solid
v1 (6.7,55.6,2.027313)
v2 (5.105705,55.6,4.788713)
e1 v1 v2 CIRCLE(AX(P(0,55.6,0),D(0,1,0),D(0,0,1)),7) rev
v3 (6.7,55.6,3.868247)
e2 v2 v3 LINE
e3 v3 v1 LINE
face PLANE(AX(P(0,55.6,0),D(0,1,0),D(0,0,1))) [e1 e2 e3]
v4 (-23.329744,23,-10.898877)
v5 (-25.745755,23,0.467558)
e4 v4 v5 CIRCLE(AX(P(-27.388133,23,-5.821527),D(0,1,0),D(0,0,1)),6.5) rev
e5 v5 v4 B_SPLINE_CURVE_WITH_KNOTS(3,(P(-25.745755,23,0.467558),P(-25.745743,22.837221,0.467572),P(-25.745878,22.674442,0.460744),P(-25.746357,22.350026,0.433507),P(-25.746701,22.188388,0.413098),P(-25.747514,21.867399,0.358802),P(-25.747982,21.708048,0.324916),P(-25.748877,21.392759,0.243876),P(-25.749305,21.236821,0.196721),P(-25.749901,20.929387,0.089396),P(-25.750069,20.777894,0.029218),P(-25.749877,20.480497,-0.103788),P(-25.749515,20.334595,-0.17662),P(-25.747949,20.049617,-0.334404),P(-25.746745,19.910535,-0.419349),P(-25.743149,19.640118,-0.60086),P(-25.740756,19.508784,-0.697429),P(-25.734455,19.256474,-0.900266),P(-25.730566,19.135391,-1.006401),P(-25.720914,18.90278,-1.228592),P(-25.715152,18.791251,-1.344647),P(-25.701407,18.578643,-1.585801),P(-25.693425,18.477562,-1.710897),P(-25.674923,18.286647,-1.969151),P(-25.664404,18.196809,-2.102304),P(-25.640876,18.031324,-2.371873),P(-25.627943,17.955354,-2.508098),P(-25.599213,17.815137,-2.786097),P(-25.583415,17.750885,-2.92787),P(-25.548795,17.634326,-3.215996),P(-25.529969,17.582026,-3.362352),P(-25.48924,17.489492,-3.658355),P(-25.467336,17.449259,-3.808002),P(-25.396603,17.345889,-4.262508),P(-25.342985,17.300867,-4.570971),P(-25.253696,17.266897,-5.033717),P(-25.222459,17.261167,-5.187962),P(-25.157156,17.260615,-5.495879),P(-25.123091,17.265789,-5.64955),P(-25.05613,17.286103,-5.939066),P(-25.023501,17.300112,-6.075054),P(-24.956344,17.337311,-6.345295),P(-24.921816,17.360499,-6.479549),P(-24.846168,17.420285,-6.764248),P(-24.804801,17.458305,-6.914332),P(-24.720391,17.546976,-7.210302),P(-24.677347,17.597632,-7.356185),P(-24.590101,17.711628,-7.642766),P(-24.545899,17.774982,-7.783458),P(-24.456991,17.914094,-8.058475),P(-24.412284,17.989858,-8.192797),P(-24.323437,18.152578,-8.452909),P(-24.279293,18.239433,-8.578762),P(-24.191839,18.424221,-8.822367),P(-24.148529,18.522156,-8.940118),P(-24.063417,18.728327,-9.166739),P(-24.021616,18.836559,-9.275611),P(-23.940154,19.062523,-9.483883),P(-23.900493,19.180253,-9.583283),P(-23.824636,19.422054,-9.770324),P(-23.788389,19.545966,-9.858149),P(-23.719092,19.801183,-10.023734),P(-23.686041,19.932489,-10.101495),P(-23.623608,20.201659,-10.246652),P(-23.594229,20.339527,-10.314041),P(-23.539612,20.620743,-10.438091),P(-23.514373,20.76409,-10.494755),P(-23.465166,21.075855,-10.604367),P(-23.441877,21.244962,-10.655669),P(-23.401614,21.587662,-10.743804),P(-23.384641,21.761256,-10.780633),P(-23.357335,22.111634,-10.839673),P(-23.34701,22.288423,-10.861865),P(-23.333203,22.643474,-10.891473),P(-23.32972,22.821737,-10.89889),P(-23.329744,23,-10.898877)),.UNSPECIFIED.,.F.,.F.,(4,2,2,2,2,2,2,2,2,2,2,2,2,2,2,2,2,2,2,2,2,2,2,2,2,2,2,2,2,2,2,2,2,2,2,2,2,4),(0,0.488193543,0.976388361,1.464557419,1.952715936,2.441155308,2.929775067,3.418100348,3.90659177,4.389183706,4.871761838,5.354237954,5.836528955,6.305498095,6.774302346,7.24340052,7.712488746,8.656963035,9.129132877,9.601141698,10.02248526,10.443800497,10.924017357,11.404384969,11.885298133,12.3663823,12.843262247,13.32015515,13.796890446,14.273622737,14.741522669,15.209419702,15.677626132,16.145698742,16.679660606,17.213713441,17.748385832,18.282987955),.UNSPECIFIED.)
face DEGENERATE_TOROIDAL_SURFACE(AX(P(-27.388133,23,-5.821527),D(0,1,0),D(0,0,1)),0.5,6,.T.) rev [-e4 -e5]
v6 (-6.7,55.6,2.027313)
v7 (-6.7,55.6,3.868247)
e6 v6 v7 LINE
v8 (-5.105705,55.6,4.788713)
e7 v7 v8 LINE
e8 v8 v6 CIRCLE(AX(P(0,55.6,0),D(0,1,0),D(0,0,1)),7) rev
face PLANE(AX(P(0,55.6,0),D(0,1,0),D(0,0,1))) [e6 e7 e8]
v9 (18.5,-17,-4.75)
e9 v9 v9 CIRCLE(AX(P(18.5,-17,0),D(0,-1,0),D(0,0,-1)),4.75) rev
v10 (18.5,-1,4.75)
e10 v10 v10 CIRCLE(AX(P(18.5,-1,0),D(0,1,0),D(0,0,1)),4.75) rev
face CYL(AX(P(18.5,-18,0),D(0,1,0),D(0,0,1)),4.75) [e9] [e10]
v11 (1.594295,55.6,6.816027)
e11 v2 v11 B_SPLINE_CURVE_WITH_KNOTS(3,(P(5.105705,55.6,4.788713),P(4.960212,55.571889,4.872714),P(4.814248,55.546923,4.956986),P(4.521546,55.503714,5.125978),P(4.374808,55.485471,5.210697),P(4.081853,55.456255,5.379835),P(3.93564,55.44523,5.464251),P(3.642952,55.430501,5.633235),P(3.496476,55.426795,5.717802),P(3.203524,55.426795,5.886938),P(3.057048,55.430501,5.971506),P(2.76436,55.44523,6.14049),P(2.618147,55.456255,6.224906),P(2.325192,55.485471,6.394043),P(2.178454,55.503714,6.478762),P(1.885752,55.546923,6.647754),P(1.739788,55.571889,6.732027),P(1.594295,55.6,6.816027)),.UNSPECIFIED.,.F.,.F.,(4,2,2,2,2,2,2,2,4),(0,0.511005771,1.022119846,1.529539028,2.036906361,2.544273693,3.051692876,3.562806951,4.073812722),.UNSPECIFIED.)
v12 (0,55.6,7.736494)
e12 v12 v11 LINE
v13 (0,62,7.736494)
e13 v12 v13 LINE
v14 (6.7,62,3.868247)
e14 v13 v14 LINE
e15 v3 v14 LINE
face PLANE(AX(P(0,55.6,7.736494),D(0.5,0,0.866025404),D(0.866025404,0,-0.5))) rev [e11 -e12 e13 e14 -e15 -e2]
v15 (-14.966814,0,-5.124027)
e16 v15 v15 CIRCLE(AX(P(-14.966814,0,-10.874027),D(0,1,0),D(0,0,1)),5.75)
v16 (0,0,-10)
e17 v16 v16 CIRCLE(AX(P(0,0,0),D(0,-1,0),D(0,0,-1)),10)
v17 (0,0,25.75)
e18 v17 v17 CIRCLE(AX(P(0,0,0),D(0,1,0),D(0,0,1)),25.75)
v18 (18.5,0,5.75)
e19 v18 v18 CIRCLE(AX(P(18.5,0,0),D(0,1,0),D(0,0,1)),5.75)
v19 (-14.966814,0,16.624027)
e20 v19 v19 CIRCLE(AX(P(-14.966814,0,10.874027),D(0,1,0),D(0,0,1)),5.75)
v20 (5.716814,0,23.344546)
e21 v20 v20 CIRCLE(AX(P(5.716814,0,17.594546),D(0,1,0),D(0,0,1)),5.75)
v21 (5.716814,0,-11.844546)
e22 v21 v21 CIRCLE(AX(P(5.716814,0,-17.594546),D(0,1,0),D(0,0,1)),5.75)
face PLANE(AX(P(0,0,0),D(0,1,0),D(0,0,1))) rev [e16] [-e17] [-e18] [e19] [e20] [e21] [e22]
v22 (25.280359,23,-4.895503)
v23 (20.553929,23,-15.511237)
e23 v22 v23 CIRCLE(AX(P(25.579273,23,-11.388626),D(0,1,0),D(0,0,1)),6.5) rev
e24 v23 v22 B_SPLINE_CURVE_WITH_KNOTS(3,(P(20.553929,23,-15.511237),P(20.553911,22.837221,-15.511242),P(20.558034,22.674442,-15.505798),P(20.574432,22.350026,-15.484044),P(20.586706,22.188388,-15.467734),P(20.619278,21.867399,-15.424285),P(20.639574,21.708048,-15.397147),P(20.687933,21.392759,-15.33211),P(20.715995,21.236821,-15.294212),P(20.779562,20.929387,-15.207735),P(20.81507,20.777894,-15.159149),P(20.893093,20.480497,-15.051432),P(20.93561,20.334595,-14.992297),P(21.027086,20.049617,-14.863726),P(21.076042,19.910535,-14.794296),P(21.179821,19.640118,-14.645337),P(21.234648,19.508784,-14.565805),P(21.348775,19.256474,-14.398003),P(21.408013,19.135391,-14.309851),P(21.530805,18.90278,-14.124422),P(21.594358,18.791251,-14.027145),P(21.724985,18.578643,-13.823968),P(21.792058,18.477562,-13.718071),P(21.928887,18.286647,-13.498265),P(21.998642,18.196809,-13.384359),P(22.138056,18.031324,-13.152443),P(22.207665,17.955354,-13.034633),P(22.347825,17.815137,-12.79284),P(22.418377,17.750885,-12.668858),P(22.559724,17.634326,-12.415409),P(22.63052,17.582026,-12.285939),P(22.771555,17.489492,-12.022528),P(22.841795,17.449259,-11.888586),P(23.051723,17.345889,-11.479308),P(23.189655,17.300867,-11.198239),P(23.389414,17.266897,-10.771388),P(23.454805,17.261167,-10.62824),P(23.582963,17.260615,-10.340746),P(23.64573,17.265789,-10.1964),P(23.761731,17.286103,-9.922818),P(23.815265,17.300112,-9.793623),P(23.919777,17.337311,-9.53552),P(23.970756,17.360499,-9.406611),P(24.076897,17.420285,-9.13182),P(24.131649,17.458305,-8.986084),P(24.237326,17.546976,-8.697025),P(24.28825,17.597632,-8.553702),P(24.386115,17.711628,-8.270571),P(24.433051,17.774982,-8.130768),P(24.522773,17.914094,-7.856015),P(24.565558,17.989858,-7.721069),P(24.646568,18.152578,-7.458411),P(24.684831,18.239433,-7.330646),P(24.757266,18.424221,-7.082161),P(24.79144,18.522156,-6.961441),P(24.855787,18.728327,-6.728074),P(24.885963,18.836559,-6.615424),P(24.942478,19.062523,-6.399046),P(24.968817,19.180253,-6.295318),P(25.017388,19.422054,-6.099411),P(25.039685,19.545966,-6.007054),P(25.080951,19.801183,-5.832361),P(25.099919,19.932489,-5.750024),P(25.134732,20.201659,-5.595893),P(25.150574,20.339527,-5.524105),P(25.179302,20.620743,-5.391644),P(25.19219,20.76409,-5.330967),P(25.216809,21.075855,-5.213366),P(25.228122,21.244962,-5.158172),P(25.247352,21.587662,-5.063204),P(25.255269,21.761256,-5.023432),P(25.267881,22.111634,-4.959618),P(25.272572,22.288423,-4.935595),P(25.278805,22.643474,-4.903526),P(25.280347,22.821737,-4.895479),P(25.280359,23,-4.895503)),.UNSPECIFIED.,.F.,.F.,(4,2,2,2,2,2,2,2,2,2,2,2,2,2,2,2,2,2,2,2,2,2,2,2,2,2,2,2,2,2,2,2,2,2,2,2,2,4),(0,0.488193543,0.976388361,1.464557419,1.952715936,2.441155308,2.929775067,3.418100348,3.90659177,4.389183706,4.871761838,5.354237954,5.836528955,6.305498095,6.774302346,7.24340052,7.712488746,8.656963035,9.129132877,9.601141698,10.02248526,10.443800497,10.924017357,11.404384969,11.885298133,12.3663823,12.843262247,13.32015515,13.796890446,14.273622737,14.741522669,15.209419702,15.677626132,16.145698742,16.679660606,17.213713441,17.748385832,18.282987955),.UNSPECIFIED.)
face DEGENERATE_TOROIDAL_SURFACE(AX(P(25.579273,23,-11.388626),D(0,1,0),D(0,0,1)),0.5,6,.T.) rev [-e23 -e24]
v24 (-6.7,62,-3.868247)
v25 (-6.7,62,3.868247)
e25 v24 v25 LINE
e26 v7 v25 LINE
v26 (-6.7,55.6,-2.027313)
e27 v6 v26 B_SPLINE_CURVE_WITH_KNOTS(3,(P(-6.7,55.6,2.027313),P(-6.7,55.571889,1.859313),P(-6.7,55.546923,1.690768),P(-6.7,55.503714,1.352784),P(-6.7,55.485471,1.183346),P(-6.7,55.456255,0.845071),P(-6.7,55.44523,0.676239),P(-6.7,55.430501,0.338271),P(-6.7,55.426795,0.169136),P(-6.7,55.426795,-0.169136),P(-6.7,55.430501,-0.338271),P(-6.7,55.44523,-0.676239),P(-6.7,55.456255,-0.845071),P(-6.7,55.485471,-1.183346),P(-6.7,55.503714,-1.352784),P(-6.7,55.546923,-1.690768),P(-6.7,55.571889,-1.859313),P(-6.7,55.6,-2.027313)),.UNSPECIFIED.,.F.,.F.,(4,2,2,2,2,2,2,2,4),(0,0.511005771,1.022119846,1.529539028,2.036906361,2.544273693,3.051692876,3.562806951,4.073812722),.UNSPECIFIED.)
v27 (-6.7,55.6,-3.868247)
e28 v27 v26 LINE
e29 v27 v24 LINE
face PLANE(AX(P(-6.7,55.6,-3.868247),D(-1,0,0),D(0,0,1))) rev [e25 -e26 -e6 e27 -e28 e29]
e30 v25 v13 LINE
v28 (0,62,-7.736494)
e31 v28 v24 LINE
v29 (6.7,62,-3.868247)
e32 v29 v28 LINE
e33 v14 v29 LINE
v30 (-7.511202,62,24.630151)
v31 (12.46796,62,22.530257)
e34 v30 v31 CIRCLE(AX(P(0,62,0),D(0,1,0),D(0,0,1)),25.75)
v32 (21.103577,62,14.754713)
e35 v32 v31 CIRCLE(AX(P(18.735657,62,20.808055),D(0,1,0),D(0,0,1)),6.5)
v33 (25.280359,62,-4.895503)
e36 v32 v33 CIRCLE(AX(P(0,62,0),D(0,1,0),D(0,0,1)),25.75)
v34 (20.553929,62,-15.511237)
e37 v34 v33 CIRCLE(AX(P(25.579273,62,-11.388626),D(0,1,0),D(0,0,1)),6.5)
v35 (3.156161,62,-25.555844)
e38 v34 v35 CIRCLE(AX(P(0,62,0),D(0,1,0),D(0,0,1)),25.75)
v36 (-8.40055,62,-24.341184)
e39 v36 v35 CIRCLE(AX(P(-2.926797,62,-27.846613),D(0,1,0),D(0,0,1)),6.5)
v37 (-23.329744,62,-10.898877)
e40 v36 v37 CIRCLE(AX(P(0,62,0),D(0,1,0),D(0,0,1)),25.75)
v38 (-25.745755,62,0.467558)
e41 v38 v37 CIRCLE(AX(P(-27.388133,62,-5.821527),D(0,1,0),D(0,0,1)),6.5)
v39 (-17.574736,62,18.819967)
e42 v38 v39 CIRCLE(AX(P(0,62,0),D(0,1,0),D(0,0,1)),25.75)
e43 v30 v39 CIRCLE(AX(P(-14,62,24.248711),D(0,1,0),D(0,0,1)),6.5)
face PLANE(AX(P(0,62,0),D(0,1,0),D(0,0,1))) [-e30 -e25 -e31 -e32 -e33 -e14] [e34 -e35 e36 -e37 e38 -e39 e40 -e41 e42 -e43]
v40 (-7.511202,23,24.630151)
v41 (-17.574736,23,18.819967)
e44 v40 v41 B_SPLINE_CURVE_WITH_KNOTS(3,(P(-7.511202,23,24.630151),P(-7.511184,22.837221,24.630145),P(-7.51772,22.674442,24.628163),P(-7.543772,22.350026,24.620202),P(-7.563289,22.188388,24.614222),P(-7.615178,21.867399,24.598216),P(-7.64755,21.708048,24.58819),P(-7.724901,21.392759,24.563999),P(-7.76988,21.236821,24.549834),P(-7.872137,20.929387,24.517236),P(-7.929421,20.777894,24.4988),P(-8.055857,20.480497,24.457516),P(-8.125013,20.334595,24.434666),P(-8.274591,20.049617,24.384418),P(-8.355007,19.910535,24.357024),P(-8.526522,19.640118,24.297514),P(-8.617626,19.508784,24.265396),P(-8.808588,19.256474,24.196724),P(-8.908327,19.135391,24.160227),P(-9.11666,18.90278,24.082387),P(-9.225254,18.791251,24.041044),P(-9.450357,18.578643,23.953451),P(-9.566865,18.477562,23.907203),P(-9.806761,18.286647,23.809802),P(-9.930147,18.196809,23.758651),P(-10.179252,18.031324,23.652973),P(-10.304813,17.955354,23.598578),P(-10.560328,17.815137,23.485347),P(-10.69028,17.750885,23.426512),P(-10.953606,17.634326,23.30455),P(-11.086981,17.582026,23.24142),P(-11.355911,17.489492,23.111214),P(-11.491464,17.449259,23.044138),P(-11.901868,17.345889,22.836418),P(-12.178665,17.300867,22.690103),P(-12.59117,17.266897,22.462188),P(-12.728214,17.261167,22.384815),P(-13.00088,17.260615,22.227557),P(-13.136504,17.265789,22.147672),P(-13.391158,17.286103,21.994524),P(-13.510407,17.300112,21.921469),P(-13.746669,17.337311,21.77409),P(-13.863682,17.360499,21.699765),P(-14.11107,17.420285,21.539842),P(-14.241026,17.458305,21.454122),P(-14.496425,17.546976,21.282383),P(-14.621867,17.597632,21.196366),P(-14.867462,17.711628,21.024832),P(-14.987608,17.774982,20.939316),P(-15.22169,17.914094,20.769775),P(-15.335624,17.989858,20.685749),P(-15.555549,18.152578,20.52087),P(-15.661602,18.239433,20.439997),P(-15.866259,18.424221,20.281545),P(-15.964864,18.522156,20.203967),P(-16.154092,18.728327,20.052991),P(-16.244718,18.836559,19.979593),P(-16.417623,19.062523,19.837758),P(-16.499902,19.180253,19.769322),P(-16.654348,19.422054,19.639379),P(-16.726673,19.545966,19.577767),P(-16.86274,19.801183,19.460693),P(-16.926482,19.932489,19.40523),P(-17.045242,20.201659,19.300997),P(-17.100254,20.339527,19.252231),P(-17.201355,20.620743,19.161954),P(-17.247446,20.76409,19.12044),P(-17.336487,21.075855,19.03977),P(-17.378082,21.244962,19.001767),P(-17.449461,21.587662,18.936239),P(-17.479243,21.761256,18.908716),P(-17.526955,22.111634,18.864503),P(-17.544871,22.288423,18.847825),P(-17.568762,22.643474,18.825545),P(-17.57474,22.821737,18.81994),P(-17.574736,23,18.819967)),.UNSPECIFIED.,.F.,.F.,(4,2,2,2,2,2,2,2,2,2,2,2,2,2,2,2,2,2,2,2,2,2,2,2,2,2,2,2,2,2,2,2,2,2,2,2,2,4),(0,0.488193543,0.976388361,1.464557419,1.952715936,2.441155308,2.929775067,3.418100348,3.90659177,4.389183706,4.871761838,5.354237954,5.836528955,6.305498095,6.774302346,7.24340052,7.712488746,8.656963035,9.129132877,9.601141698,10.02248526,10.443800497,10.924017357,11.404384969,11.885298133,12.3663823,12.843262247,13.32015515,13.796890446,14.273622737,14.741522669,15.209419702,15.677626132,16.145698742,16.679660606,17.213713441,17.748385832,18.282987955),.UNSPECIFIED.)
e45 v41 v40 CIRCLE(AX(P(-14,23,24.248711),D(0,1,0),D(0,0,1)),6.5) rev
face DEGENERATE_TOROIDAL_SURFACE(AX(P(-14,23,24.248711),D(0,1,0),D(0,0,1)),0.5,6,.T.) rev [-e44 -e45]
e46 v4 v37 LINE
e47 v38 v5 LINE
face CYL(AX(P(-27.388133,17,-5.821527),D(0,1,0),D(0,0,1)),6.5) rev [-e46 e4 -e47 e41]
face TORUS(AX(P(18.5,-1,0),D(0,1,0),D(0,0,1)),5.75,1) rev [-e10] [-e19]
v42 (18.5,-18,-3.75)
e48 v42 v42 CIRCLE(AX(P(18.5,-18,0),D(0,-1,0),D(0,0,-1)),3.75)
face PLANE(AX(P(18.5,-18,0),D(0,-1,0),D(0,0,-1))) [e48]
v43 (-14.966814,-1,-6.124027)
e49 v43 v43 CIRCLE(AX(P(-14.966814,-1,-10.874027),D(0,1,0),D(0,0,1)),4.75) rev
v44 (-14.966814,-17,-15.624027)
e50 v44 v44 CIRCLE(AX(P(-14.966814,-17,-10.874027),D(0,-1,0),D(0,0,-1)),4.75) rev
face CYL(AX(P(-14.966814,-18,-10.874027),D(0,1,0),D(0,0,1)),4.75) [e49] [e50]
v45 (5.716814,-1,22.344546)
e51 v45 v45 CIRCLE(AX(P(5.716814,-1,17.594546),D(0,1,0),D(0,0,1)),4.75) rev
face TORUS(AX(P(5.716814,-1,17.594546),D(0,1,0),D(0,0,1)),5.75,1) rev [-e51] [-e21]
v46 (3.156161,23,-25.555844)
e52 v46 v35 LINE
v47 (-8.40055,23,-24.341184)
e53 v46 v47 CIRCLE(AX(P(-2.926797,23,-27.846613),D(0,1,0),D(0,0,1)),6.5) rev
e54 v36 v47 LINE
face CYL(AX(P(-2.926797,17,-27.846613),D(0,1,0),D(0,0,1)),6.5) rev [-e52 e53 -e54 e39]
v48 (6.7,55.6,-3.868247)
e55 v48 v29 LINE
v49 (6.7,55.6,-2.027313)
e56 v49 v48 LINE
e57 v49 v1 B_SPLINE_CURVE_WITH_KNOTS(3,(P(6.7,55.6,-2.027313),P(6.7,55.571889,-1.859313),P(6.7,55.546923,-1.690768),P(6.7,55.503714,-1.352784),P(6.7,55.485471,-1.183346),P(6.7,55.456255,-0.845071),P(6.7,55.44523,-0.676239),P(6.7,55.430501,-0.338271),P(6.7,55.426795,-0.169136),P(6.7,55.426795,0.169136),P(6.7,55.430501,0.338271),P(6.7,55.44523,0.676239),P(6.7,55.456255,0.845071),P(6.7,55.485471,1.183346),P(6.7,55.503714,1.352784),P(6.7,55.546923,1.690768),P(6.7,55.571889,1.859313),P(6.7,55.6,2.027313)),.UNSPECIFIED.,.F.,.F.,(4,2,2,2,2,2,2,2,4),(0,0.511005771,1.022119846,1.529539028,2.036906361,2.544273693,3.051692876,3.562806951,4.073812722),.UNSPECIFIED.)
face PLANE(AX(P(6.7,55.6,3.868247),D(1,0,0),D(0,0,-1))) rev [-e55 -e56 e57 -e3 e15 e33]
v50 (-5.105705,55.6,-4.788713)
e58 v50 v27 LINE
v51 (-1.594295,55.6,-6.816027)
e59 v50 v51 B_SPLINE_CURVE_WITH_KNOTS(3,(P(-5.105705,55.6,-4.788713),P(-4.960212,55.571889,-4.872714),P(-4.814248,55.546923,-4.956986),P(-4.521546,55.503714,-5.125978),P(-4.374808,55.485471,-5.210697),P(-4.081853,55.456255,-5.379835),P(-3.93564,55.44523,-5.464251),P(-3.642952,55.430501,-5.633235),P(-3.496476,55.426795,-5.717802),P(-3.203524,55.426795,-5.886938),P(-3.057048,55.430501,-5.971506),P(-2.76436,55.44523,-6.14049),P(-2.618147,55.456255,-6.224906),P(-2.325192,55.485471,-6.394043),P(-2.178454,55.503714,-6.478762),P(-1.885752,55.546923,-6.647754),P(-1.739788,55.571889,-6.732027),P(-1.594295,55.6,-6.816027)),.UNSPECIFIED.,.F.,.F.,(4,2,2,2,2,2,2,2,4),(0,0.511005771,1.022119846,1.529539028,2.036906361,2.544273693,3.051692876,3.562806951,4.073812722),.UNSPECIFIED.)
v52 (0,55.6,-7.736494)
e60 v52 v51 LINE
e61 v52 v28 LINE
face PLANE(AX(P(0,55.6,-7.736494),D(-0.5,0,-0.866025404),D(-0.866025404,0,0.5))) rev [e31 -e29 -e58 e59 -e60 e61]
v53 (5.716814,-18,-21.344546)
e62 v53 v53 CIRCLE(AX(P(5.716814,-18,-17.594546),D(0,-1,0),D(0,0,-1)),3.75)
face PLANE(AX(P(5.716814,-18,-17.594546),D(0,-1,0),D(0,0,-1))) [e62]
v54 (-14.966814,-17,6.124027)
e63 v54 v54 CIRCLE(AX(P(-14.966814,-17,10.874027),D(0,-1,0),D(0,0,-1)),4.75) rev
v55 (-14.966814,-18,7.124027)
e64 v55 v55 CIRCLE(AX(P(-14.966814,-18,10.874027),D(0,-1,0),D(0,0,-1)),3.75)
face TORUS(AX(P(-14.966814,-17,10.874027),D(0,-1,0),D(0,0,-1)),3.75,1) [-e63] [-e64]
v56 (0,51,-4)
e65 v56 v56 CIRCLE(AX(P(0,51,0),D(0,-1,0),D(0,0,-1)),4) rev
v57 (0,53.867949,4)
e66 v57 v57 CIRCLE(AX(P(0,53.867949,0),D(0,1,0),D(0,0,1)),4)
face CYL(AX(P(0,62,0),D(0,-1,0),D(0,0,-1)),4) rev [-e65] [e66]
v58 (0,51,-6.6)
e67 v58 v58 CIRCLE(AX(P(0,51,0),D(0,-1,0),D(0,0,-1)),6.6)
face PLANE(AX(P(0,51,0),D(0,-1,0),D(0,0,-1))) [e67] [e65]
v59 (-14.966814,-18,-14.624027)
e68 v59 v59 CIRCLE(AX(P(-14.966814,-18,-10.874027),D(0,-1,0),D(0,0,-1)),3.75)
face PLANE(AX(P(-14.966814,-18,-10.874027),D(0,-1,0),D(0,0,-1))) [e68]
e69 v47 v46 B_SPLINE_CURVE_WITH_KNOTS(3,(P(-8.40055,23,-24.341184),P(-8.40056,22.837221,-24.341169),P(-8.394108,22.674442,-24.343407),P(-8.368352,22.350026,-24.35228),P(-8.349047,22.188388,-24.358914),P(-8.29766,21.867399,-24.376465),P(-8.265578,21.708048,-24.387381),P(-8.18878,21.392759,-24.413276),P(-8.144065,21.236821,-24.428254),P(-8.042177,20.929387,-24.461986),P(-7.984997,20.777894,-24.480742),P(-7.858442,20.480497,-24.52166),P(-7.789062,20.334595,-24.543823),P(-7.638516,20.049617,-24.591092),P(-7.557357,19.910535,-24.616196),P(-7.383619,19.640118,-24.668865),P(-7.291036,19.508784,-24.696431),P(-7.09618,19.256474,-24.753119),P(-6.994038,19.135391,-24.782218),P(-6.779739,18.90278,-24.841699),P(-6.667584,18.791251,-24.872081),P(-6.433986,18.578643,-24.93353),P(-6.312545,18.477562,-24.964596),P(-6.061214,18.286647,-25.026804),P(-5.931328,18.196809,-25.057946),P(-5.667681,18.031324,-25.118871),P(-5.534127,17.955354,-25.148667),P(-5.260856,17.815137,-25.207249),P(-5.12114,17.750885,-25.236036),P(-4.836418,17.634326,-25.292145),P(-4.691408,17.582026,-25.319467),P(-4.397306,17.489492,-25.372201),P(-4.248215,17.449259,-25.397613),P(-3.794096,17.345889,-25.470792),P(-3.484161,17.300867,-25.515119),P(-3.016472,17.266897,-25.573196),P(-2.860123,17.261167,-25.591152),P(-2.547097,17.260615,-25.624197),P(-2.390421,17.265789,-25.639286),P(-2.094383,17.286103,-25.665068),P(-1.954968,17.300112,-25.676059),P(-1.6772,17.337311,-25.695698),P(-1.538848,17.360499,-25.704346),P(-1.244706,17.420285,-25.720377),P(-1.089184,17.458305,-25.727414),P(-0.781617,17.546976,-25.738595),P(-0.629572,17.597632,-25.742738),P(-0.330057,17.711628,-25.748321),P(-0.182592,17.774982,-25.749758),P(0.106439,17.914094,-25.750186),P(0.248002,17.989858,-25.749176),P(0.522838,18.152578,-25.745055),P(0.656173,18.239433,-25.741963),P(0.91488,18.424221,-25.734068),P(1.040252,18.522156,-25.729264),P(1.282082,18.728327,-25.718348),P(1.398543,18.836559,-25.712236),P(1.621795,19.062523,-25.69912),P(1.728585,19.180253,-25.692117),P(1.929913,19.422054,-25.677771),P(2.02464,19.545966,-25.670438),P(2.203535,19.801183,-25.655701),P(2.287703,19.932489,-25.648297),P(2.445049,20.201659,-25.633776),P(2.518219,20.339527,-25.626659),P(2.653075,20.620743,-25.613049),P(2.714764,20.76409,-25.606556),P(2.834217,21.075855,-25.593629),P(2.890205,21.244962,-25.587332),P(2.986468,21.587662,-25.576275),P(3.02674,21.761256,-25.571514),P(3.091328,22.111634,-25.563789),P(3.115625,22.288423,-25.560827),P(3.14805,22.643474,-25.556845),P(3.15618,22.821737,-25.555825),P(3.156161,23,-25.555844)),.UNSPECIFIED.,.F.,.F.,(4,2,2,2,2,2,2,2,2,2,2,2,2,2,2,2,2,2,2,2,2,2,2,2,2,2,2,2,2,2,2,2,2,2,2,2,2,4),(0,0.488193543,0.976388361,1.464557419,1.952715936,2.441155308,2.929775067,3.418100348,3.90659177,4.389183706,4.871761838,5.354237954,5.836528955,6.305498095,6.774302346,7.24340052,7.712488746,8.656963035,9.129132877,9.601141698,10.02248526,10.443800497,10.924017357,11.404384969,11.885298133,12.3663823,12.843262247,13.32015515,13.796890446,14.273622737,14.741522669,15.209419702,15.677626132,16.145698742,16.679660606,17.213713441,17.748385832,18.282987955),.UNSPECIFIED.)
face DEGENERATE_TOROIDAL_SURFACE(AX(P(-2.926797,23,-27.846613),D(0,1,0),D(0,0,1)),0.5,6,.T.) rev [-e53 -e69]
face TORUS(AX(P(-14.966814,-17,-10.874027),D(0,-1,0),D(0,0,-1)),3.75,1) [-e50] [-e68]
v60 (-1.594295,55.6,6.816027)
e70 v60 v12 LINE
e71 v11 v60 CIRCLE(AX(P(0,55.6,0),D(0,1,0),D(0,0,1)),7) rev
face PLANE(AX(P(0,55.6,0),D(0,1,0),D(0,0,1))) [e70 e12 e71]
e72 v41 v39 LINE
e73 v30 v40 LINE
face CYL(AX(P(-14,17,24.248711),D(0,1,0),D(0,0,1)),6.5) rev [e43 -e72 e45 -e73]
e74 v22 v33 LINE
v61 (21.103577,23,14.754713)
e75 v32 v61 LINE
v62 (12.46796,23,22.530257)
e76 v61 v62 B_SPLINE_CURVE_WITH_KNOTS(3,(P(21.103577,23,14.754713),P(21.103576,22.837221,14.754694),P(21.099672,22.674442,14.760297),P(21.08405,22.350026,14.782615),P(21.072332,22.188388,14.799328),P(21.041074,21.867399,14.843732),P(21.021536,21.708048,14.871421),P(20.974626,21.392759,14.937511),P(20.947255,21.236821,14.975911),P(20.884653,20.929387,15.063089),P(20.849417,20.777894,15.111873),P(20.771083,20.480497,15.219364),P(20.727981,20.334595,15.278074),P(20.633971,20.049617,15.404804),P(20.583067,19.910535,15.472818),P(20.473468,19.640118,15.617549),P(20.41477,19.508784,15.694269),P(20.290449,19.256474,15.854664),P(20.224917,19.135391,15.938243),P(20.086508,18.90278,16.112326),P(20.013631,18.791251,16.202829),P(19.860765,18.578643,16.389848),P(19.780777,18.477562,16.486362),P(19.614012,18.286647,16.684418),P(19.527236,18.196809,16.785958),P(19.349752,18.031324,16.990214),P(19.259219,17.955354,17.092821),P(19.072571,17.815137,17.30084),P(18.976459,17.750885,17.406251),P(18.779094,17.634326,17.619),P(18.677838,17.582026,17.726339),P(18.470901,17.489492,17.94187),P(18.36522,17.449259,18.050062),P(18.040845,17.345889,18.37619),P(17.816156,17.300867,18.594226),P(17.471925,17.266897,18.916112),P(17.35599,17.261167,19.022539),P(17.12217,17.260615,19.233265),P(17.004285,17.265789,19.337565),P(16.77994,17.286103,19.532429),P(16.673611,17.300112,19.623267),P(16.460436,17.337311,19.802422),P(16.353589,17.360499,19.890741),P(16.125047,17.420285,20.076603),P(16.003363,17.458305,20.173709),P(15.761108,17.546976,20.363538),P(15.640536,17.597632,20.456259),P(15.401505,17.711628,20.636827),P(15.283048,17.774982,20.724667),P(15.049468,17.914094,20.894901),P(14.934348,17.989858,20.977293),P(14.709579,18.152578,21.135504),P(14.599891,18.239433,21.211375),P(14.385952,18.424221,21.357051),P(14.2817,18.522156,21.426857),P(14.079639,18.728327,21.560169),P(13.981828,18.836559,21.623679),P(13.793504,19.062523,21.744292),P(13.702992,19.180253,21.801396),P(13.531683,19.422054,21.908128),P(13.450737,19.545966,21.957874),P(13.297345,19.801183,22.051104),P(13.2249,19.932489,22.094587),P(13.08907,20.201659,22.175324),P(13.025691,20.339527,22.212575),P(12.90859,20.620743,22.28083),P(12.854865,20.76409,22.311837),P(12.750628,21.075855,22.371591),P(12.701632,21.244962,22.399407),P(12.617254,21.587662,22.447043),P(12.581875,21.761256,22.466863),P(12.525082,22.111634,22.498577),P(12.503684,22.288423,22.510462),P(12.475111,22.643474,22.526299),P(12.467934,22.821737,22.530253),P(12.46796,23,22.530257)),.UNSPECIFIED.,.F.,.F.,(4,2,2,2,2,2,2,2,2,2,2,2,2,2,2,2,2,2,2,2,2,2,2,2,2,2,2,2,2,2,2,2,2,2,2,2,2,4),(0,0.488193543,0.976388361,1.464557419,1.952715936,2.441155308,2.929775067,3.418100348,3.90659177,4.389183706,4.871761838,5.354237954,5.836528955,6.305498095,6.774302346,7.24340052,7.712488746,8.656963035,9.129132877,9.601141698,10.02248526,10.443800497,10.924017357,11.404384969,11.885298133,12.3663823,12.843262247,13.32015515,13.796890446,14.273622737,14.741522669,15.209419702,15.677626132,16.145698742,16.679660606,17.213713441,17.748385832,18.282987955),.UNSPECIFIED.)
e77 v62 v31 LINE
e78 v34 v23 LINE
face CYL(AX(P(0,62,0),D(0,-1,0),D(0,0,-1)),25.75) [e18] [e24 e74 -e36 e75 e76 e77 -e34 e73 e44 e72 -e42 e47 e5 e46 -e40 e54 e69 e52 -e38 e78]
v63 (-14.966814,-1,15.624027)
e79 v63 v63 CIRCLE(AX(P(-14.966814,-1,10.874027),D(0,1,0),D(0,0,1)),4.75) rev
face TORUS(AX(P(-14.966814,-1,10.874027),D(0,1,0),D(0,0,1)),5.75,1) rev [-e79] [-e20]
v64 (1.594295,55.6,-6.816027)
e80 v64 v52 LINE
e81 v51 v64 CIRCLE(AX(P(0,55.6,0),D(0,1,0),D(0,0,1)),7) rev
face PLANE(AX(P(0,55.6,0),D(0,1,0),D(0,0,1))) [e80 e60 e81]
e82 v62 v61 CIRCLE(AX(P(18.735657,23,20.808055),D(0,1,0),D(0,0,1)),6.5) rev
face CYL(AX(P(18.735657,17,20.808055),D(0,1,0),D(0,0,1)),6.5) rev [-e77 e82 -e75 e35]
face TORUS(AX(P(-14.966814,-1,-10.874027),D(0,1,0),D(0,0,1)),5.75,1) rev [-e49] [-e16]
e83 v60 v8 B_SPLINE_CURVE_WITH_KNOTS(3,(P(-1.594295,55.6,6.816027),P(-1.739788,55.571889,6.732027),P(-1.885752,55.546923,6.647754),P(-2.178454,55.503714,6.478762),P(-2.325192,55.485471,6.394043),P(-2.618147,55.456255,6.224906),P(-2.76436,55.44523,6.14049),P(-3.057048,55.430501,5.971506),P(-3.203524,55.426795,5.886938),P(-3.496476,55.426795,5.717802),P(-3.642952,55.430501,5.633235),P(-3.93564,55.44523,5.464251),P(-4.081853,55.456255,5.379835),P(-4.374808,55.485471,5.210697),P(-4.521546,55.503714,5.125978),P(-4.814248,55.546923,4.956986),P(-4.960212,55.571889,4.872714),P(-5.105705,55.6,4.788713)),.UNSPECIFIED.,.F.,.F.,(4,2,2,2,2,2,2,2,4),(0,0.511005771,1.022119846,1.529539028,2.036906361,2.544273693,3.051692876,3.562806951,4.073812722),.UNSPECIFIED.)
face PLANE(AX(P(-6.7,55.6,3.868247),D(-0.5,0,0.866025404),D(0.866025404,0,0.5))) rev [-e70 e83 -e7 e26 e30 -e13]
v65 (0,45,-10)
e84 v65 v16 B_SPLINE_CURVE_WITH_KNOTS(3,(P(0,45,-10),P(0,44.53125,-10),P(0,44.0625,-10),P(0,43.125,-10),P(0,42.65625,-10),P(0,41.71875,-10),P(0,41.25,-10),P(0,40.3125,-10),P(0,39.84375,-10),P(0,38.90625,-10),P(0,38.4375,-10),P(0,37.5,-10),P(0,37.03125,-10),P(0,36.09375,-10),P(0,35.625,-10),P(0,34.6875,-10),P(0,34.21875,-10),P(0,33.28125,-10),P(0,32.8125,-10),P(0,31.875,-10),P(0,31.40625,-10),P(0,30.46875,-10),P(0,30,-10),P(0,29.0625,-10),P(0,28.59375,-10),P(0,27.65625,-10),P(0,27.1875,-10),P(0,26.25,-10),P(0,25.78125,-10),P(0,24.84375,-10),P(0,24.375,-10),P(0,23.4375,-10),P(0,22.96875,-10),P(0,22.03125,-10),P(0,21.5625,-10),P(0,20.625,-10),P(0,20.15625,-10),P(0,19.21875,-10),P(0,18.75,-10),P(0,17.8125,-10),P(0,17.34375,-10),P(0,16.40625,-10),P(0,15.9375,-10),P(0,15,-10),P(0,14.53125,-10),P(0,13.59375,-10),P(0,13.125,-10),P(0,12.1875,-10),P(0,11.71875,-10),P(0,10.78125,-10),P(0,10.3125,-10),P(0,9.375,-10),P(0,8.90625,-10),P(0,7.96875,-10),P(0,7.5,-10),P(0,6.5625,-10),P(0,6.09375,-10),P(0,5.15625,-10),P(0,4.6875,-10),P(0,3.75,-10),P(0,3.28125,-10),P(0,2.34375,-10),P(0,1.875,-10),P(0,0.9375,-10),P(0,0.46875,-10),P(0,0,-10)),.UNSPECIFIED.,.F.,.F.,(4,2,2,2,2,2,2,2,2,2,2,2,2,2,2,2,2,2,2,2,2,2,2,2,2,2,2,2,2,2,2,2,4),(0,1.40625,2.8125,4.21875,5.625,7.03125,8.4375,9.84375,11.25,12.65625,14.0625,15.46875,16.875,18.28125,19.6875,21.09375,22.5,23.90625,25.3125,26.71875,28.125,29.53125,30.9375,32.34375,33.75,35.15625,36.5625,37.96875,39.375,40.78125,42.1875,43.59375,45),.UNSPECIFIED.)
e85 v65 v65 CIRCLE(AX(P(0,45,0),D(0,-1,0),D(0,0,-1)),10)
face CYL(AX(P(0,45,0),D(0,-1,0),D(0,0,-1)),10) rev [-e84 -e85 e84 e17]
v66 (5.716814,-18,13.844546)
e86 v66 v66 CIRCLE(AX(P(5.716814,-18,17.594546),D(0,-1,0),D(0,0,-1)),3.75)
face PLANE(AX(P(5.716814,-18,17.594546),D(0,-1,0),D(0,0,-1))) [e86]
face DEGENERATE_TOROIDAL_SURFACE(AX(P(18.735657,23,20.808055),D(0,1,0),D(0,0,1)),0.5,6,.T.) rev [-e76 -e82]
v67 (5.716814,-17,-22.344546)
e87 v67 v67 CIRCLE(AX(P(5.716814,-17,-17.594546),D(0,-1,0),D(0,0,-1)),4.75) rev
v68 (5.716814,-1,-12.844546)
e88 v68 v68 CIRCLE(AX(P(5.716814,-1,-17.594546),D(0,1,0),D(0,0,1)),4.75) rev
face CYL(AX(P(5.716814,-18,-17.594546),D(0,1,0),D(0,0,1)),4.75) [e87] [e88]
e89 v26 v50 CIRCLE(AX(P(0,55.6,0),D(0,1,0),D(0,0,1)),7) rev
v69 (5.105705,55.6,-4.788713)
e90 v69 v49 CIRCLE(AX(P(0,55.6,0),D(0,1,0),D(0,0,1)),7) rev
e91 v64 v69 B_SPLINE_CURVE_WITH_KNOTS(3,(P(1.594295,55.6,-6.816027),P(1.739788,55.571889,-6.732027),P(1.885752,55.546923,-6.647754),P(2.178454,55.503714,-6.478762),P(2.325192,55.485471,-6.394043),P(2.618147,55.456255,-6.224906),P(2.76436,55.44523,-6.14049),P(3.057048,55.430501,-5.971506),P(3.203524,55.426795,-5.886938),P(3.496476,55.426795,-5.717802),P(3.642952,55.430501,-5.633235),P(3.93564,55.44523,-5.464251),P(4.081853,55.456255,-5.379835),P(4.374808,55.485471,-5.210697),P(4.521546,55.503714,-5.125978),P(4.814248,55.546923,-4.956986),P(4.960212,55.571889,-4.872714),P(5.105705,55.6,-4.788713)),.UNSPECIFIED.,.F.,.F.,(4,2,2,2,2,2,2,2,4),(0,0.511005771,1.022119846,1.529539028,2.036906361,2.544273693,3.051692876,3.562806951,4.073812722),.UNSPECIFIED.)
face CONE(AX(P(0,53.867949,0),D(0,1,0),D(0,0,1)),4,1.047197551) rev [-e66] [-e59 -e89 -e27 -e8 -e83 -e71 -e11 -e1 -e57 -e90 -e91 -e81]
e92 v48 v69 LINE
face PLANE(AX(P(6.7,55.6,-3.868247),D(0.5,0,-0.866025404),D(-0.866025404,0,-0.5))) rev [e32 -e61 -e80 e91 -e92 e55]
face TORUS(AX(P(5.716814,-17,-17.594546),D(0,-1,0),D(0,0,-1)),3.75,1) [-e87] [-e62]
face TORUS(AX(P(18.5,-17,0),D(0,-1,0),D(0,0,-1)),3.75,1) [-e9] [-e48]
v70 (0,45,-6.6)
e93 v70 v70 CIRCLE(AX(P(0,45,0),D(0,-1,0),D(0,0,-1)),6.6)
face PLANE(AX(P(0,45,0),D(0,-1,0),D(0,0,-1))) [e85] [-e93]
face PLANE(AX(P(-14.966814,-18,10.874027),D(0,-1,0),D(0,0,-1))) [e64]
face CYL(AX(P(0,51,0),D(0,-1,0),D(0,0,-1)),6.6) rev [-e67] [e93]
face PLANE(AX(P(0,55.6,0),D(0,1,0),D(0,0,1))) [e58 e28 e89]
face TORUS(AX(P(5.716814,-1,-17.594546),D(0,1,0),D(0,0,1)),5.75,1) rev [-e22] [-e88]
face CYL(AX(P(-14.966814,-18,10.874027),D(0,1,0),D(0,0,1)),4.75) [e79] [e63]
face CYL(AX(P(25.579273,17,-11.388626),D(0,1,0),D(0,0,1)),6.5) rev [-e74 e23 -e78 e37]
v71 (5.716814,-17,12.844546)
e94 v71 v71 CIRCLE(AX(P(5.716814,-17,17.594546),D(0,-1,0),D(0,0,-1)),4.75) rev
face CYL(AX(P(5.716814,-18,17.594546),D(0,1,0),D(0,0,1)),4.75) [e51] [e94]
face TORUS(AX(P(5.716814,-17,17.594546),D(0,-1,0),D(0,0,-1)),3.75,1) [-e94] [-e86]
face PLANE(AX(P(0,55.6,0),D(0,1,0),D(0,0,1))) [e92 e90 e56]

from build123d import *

# Parameters (mm, degrees)
SKETCH1_R           = 25.75
BOSS_EXTRUDE1_DEPTH = 62
SKETCH2_R           = 4.75
BOSS_EXTRUDE2_DEPTH = 18
FILLET1_R           = 1
FILLET2_R           = 1
CUT_EXTRUDE1_DEPTH  = 6.4
SKETCH4_R           = 10
CUT_EXTRUDE2_DEPTH  = 45
SKETCH5_R           = 4
CUT_EXTRUDE3_DEPTH  = 73.767609553
SKETCH6_R           = 6.5
CUT_EXTRUDE4_DEPTH  = 45
FILLET3_R           = 6
CHAMFER3_SIZE       = 3
CHAMFER3_SIZE_2     = 1.732050808
SKETCH7_R           = 6.6
CUT_EXTRUDE5_DEPTH  = 6


with BuildPart() as part:
    # Sketch1 → Boss-Extrude1 (new body)
    with BuildSketch(Plane(origin=(0, 0, 0), x_dir=(1, 0, 0), z_dir=(0, 1, 0))):
        with Locations(Location((0, 0, 0), (0, 0, 270))):
            Circle(SKETCH1_R)
    extrude(amount=BOSS_EXTRUDE1_DEPTH)

    # Sketch2 → Boss-Extrude2 (add)
    with BuildSketch(Plane.XZ):
        with Locations(Location((18.5, 0, 0), (0, 0, 90))):
            Circle(SKETCH2_R)
        with Locations(Location((5.716814396, -17.594545551, 0), (0, 0, 90))):
            Circle(SKETCH2_R)
        with Locations(Location((-14.966814396, -10.874027167, 0), (0, 0, 90))):
            Circle(SKETCH2_R)
        with Locations(Location((-14.966814396, 10.874027167, 0), (0, 0, 90))):
            Circle(SKETCH2_R)
        with Locations(Location((5.716814396, 17.594545551, 0), (0, 0, 90))):
            Circle(SKETCH2_R)
    extrude(amount=BOSS_EXTRUDE2_DEPTH)

    # Fillet1
    fillet1_edges = [part.edges().sort_by_distance(p)[0] for p in [
        (-14.966814396, 0, -15.624027167),
        (-14.966814396, 0, 6.124027167),
        (5.716814396, 0, 12.844545551),
        (18.5, 0, -4.75),
        (5.716814396, 0, -22.344545551),
    ]]
    fillet(fillet1_edges, radius=FILLET1_R)

    # Fillet2
    fillet2_edges = [part.edges().sort_by_distance(p)[0] for p in [
        (-14.966814396, -18, -15.624027167),
        (-14.966814396, -18, 6.124027167),
        (5.716814396, -18, 12.844545551),
        (18.5, -18, -4.75),
        (5.716814396, -18, -22.344545551),
    ]]
    fillet(fillet2_edges, radius=FILLET2_R)

    # Sketch3 → Cut-Extrude1 (cut)
    with BuildSketch(Plane(origin=(0, 62, 0), x_dir=(1, 0, 0), z_dir=(0, 1, 0))):
        Polygon((0, -7.736493607), (6.7, -3.868246804), (6.7, 3.868246804), (0, 7.736493607), (-6.7, 3.868246804), (-6.7, -3.868246804), align=None)
    extrude(amount=-CUT_EXTRUDE1_DEPTH, mode=Mode.SUBTRACT)

    # Sketch4 → Cut-Extrude2 (cut)
    with BuildSketch(Plane.XZ):
        with Locations(Location((0, 0, 0), (0, 0, 270))):
            Circle(SKETCH4_R)
    extrude(amount=-CUT_EXTRUDE2_DEPTH, mode=Mode.SUBTRACT)

    # Sketch5 → Cut-Extrude3 (cut, through all)
    with BuildSketch(Plane.XZ.offset(-45)):
        with Locations(Location((0, 0, 0), (0, 0, 270))):
            Circle(SKETCH5_R)
    extrude(amount=-CUT_EXTRUDE3_DEPTH, mode=Mode.SUBTRACT)

    # Sketch6 → Cut-Extrude4 (cut)
    with BuildSketch(Plane(origin=(0, 62, 0), x_dir=(1, 0, 0), z_dir=(0, 1, 0))):
        with Locations((-14, -24.248711306)):
            Circle(SKETCH6_R)
        with Locations((-27.388132821, 5.821527343)):
            Circle(SKETCH6_R)
        with Locations((-2.926796971, 27.84661307)):
            Circle(SKETCH6_R)
        with Locations((25.579272814, 11.388626006)):
            Circle(SKETCH6_R)
        with Locations((18.735656978, -20.808055113)):
            Circle(SKETCH6_R)
    extrude(amount=-CUT_EXTRUDE4_DEPTH, mode=Mode.SUBTRACT)

    # Fillet3
    # the kernel refuses this fillet: 6 mm, written as the material it adds along each edge
    with BuildSketch(Plane(origin=(-14, 17, 24.248711306), x_dir=(-0.5027182271719127, 0, 0.8644503363809452), z_dir=(0.8644503363809452, 0, 0.5027182271719127))) as fillet3_piece_1_section:
        with BuildLine():
            CenterArc((6.5 - FILLET3_R, -FILLET3_R), FILLET3_R, 0, 90)
            Line((6.5 - FILLET3_R, 0), (6.5, 0))
            Line((6.5, 0), (6.5, -FILLET3_R))
        make_face()
    fillet3_piece_1 = revolve(axis=Axis((-14, 17, 24.248711306), (0, -1, 0)), revolution_arc=359.64, mode=Mode.PRIVATE)
    fillet3_piece_1 = fillet3_piece_1 & Plane(origin=(0, 19.401898433, 0), x_dir=(0, 0, 1), z_dir=(0, -1, 0)) * Cylinder(25.75, 27, mode=Mode.PRIVATE)
    add(fillet3_piece_1)
    with BuildSketch(Plane(origin=(-27.388132821, 17, -5.821527343), x_dir=(-0.9774896010068019, 0, -0.21098360107734276), z_dir=(-0.21098360107734276, 0, 0.9774896010068019))) as fillet3_piece_2_section:
        with BuildLine():
            CenterArc((6.5 - FILLET3_R, -FILLET3_R), FILLET3_R, 0, 90)
            Line((6.5 - FILLET3_R, 0), (6.5, 0))
            Line((6.5, 0), (6.5, -FILLET3_R))
        make_face()
    fillet3_piece_2 = revolve(axis=Axis((-27.388132821, 17, -5.821527343), (0, -1, 0)), revolution_arc=359.64, mode=Mode.PRIVATE)
    fillet3_piece_2 = fillet3_piece_2 & Plane(origin=(0, 19.401898433, 0), x_dir=(0, 0, 1), z_dir=(0, -1, 0)) * Cylinder(25.75, 27, mode=Mode.PRIVATE)
    add(fillet3_piece_2)
    with BuildSketch(Plane(origin=(-2.926796971, 17, -27.84661307), x_dir=(-0.1076523249817097, 0, -0.9941886022913521), z_dir=(0.9941886022913521, 0, -0.1076523249817097))) as fillet3_piece_3_section:
        with BuildLine():
            CenterArc((6.5 - FILLET3_R, FILLET3_R), FILLET3_R, 270, 90)
            Line((6.5 - FILLET3_R, 0), (6.5, 0))
            Line((6.5, 0), (6.5, FILLET3_R))
        make_face()
    fillet3_piece_3 = revolve(axis=Axis((-2.926796971, 17, -27.84661307), (0, 1, 0)), revolution_arc=359.64, mode=Mode.PRIVATE)
    fillet3_piece_3 = fillet3_piece_3 & Plane(origin=(0, 19.401898433, 0), x_dir=(0, 0, 1), z_dir=(0, -1, 0)) * Cylinder(25.75, 26, mode=Mode.PRIVATE)
    add(fillet3_piece_3)
    with BuildSketch(Plane(origin=(25.579272814, 17, -11.388626006), x_dir=(0.9122631507322384, 0, -0.40960461889008193), z_dir=(0.40960461889008193, 0, 0.9122631507322384))) as fillet3_piece_4_section:
        with BuildLine():
            CenterArc((6.5 - FILLET3_R, FILLET3_R), FILLET3_R, 270, 90)
            Line((6.5 - FILLET3_R, 0), (6.5, 0))
            Line((6.5, 0), (6.5, FILLET3_R))
        make_face()
    fillet3_piece_4 = revolve(axis=Axis((25.579272814, 17, -11.388626006), (0, 1, 0)), revolution_arc=359.64, mode=Mode.PRIVATE)
    fillet3_piece_4 = fillet3_piece_4 & Plane(origin=(0, 19.401898433, 0), x_dir=(0, 0, 1), z_dir=(0, -1, 0)) * Cylinder(25.75, 27, mode=Mode.PRIVATE)
    add(fillet3_piece_4)
    with BuildSketch(Plane(origin=(18.735656978, 17, 20.808055113), x_dir=(0.6714619588183017, 0, 0.7410390258683339), z_dir=(-0.7410390258683339, 0, 0.6714619588183017))) as fillet3_piece_5_section:
        with BuildLine():
            CenterArc((6.5 - FILLET3_R, FILLET3_R), FILLET3_R, 270, 90)
            Line((6.5 - FILLET3_R, 0), (6.5, 0))
            Line((6.5, 0), (6.5, FILLET3_R))
        make_face()
    fillet3_piece_5 = revolve(axis=Axis((18.735656978, 17, 20.808055113), (0, 1, 0)), revolution_arc=359.64, mode=Mode.PRIVATE)
    fillet3_piece_5 = fillet3_piece_5 & Plane(origin=(0, 19.401898433, 0), x_dir=(0, 0, 1), z_dir=(0, -1, 0)) * Cylinder(25.75, 27, mode=Mode.PRIVATE)
    add(fillet3_piece_5)

    # Chamfer3
    # the kernel refuses this chamfer: 3, 1.732050808 mm, written as the material it takes off along each edge
    with BuildSketch(Plane(origin=(0, 55.6, 0), x_dir=(0, 0, -1), z_dir=(-1, 0, 0))) as chamfer3_piece_1_section:
        Polygon((4 + CHAMFER3_SIZE, 0), (4, CHAMFER3_SIZE_2), (4, 0), align=None)
    chamfer3_piece_1 = revolve(axis=Axis((0, 55.6, 0), (0, -1, 0)), mode=Mode.PRIVATE)
    chamfer3_piece_1 = split(chamfer3_piece_1, bisect_by=Plane(origin=(0.978192269, 54.773023112, 7.171734038), z_dir=(-0.4999999999999997, 0, -0.8660254037844388)), keep=Keep.TOP, mode=Mode.PRIVATE)
    chamfer3_piece_1 = split(chamfer3_piece_1, bisect_by=Plane(origin=(-0.978192269, 54.773023112, 7.171734038), z_dir=(0.5000000000000001, 0, -0.8660254037844386)), keep=Keep.TOP, mode=Mode.PRIVATE)
    chamfer3_piece_1 = split(chamfer3_piece_1, bisect_by=Plane(origin=(-6.7, 54.773023112, 5.477455329), z_dir=(1, 0, 0)), keep=Keep.TOP, mode=Mode.PRIVATE)
    chamfer3_piece_1 = split(chamfer3_piece_1, bisect_by=Plane(origin=(-5.721807731, 54.773023112, -4.433006373), z_dir=(0.49999999999999994, 0, 0.8660254037844387)), keep=Keep.TOP, mode=Mode.PRIVATE)
    chamfer3_piece_1 = split(chamfer3_piece_1, bisect_by=Plane(origin=(5.721807731, 54.773023112, -4.433006373), z_dir=(-0.5000000000000001, 0, 0.8660254037844386)), keep=Keep.TOP, mode=Mode.PRIVATE)
    chamfer3_piece_1 = split(chamfer3_piece_1, bisect_by=Plane(origin=(6.7, 54.773023112, 5.477455329), z_dir=(-1, 0, 0)), keep=Keep.TOP, mode=Mode.PRIVATE)
    add(chamfer3_piece_1, mode=Mode.SUBTRACT)

    # Sketch7 → Cut-Extrude5 (cut)
    with BuildSketch(Plane.XZ.offset(-45)):
        with Locations(Location((0, 0, 0), (0, 0, 270))):
            Circle(SKETCH7_R)
    extrude(amount=-CUT_EXTRUDE5_DEPTH, mode=Mode.SUBTRACT)


solid = part.part
